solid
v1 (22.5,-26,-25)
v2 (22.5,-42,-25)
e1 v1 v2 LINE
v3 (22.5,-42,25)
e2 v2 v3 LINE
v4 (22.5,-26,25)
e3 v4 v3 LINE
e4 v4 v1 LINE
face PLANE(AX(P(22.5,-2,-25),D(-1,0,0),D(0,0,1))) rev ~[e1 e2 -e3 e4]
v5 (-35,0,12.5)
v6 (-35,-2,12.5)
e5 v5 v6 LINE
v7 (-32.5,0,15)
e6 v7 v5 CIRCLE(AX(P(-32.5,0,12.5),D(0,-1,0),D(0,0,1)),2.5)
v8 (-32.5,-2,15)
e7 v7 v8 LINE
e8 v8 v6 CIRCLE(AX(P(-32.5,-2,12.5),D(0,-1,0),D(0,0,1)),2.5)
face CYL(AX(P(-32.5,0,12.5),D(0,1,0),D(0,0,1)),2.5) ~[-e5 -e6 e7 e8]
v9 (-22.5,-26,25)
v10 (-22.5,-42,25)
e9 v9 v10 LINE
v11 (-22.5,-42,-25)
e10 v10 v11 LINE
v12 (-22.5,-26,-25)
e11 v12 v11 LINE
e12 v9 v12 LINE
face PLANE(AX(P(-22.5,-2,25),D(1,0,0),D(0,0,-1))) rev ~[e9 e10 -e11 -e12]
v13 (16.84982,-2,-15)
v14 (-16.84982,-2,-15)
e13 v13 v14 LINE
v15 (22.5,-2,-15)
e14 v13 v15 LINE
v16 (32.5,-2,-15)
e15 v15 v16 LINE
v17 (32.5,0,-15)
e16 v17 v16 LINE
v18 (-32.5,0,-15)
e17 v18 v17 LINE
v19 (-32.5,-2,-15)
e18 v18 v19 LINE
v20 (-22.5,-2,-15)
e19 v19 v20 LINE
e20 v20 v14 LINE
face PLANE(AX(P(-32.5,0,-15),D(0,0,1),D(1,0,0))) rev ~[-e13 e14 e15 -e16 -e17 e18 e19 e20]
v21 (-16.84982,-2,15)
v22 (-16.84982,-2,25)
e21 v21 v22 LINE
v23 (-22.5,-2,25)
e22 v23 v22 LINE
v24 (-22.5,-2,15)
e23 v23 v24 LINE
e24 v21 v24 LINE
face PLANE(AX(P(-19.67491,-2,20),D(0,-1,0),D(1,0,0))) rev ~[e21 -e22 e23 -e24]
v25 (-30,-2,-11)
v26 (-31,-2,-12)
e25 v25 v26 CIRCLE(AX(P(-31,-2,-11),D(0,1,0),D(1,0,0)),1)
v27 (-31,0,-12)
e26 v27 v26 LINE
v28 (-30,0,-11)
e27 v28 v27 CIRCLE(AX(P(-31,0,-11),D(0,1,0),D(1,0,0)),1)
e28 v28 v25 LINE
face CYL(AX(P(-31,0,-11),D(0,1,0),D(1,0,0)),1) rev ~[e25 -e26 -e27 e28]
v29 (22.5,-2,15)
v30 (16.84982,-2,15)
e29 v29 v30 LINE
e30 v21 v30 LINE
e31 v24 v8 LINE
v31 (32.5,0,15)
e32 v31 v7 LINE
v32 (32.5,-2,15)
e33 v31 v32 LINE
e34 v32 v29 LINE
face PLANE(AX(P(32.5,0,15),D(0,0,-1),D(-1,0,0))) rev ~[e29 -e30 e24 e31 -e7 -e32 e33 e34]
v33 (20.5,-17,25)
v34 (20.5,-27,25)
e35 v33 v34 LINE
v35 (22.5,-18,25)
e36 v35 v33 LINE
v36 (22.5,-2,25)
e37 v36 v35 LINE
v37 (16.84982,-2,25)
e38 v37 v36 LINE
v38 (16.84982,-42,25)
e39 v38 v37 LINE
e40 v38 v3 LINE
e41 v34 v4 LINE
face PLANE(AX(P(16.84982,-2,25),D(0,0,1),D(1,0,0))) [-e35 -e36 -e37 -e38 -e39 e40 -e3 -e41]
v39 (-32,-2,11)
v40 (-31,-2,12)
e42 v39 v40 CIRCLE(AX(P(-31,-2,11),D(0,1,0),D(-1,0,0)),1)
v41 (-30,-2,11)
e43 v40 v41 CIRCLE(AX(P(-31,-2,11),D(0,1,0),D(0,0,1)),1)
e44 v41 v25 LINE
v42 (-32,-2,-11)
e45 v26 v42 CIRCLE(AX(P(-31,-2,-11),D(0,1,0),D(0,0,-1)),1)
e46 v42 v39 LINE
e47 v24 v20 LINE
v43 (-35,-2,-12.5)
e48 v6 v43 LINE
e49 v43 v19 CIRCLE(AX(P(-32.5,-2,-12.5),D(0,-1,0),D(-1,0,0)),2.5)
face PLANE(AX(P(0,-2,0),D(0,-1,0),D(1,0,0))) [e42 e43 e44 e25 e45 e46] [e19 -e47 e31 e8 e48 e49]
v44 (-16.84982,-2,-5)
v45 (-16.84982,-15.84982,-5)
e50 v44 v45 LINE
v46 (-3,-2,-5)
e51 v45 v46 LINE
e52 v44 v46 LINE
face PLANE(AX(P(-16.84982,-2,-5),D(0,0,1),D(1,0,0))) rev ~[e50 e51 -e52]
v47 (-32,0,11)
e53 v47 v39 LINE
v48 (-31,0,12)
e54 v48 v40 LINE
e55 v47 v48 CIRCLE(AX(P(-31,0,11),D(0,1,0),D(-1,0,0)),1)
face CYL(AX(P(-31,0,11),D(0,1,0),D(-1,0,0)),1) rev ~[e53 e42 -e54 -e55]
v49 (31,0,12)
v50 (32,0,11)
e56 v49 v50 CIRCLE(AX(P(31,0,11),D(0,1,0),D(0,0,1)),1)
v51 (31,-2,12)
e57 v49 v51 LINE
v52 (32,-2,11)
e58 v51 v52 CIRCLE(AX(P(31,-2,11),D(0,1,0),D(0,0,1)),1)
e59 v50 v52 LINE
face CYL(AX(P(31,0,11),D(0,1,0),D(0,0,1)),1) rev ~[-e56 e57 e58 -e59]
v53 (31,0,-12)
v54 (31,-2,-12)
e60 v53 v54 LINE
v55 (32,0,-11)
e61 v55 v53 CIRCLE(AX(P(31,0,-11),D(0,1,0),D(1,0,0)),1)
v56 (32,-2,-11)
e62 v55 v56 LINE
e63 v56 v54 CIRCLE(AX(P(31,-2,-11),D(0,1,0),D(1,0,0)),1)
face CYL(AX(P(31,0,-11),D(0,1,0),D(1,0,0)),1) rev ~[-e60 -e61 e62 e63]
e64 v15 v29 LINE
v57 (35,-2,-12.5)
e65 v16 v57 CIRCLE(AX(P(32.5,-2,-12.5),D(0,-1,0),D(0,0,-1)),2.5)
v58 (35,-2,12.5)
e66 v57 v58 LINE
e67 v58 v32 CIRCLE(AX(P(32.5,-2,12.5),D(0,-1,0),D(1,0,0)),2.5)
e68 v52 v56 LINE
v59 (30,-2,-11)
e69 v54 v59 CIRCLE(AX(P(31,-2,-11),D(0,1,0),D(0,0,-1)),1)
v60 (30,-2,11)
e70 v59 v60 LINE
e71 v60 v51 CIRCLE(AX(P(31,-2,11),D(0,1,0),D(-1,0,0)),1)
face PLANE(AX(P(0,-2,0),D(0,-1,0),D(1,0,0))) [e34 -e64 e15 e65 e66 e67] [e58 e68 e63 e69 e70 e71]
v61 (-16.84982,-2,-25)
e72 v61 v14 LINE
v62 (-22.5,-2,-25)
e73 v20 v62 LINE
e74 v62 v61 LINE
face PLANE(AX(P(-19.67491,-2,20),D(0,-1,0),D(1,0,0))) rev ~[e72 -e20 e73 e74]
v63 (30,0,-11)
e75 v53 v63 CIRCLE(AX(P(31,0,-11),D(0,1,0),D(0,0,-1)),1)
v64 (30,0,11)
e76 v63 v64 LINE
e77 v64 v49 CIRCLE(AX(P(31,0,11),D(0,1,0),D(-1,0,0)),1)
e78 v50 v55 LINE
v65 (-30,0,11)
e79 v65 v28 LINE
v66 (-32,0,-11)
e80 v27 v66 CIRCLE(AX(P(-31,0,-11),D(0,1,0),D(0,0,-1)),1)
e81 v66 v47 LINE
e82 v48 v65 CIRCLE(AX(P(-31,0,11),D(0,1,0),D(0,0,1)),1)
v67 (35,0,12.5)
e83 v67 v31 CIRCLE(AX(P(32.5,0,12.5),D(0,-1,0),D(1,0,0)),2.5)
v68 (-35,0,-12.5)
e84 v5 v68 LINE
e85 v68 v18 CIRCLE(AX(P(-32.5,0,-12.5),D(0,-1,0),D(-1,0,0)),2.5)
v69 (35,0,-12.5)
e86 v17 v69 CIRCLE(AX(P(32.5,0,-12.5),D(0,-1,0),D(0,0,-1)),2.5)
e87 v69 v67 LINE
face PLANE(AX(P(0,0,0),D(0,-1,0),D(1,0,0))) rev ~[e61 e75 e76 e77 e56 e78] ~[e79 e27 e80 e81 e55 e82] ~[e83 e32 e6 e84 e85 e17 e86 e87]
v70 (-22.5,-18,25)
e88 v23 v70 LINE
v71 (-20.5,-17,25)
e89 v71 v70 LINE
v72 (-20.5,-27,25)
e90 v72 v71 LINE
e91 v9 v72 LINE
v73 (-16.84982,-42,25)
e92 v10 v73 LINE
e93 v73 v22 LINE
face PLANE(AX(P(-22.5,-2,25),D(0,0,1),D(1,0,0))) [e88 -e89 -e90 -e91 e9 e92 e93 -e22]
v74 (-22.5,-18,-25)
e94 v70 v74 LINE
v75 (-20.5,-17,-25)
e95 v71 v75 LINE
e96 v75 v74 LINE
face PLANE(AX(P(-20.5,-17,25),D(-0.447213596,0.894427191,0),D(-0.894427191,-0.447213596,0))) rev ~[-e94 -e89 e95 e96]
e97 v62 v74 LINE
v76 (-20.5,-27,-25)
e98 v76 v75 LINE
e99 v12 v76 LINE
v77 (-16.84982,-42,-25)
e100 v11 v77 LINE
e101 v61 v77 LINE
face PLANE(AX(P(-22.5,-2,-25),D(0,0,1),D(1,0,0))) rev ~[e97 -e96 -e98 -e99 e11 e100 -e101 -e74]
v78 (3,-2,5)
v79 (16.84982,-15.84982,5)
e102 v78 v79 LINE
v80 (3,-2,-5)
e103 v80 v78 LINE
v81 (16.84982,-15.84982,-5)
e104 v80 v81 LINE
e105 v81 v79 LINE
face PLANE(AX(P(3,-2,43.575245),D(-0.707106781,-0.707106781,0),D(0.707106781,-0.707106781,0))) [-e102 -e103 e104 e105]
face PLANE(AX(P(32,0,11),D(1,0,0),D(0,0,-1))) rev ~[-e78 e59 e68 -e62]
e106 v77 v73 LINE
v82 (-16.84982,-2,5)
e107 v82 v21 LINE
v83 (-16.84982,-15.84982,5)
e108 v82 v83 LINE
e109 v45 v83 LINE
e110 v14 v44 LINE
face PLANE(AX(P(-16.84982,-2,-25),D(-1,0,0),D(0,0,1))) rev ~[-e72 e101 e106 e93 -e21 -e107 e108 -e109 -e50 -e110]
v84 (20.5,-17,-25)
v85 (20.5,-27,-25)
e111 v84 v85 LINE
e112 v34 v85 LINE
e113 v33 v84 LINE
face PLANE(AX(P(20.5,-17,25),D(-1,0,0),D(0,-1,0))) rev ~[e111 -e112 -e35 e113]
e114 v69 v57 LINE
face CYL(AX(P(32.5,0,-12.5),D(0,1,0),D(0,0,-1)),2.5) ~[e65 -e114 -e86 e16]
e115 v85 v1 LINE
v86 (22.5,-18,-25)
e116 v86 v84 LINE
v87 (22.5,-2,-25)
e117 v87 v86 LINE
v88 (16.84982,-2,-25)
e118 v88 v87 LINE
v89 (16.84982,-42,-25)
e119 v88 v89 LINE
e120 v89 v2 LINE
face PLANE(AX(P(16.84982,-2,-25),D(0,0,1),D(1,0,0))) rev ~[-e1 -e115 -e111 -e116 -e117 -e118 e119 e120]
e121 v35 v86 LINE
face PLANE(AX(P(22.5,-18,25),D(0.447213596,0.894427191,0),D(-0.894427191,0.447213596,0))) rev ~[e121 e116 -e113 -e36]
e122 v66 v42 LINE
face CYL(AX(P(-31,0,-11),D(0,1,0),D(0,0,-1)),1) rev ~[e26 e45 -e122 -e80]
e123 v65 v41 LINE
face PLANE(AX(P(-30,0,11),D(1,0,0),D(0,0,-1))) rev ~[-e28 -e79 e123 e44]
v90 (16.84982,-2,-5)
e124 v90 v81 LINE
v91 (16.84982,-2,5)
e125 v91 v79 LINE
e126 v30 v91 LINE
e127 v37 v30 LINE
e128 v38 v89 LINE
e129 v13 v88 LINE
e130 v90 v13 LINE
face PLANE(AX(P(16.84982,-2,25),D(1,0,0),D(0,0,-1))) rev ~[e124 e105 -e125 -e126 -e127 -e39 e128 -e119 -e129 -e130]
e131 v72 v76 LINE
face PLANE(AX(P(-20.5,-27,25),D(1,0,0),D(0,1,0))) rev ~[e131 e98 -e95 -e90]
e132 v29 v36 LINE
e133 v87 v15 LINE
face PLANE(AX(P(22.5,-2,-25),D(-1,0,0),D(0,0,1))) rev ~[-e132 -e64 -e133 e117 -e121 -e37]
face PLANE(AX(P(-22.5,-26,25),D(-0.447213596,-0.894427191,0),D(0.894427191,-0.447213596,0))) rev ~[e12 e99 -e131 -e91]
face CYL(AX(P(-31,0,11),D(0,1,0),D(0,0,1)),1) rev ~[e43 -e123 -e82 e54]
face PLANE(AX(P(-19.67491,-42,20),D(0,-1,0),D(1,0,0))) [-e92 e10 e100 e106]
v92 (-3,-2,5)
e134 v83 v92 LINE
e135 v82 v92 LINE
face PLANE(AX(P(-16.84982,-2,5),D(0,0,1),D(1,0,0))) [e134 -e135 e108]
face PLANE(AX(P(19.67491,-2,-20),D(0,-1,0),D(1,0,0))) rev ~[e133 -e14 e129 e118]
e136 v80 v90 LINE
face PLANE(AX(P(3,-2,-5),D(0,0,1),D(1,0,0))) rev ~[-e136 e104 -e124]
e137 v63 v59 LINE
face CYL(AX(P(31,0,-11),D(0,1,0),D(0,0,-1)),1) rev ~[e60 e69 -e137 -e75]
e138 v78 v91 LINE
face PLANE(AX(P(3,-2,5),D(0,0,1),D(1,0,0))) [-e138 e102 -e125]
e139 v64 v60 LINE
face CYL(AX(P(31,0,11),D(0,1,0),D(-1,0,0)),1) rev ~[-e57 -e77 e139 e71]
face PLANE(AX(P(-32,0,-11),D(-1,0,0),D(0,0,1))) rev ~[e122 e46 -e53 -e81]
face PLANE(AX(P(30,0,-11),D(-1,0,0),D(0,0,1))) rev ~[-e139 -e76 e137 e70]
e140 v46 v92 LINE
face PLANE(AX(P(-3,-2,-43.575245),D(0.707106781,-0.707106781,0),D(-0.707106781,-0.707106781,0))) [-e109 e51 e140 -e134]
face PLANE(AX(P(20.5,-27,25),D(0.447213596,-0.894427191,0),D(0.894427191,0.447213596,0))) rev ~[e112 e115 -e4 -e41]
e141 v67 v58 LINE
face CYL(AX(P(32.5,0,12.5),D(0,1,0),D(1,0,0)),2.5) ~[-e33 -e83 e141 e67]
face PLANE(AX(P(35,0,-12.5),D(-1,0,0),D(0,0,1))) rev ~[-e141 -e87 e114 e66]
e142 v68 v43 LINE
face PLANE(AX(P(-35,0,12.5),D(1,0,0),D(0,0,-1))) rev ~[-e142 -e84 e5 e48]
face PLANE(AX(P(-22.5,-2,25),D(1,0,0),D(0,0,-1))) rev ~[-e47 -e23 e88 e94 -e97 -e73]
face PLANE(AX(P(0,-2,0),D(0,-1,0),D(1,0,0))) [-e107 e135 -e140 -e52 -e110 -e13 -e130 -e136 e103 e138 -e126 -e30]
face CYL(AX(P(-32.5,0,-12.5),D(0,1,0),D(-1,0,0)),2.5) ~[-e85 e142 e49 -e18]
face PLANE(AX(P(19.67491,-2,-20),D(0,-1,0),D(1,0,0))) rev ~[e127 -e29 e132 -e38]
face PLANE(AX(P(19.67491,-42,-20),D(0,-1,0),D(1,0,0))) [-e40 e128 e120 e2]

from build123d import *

# Parameters (mm, degrees)
F1_DEPTH      = 2
F2_W          = 5.6501800592
F2_H          = 10
F2_H_2        = 30
F3_DEPTH      = 40
F5_DEPTH      = 50
F7_DEPTH      = 50
F8_W          = 13.8498199408
F8_H          = 10
F9_DEPTH      = 15
F10_T4_DEPTH  = 87.150489639
F10_T10_DEPTH = 87.150489639


# Not quite as in the source:
# - a fillet or chamfer that OpenCascade refuses, or shapes differently, is made with other operations: its cross-section is extruded or revolved along the edge and cut away or added


with BuildPart() as f1:
    # F0 (on Front) → F1 (new body)
    with BuildSketch(Plane.XZ):
        with BuildLine():
            Line((32.5, 15), (-32.5, 15))
            ThreePointArc((-32.5, 15), (-34.267766953, 14.267766953), (-35, 12.5))
            Line((-35, 12.5), (-35, -12.5))
            ThreePointArc((-35, -12.5), (-34.267766953, -14.267766953), (-32.5, -15))
            Line((-32.5, -15), (32.5, -15))
            ThreePointArc((32.5, -15), (34.267766953, -14.267766953), (35, -12.5))
            Line((35, -12.5), (35, 12.5))
            ThreePointArc((35, 12.5), (34.267766953, 14.267766953), (32.5, 15))
        make_face()
        with BuildLine():
            Line((-32, -11), (-32, 11))
            ThreePointArc((-32, 11), (-31.7071067812, 11.7071067812), (-31, 12))
            ThreePointArc((-31, 12), (-30.2928932188, 11.7071067812), (-30, 11))
            Line((-30, 11), (-30, -11))
            ThreePointArc((-30, -11), (-30.2928932188, -11.7071067812), (-31, -12))
            ThreePointArc((-31, -12), (-31.7071067812, -11.7071067812), (-32, -11))
        make_face(mode=Mode.SUBTRACT)
        with BuildLine():
            Line((30, -11), (30, 11))
            ThreePointArc((30, 11), (30.2928932188, 11.7071067812), (31, 12))
            ThreePointArc((31, 12), (31.7071067812, 11.7071067812), (32, 11))
            Line((32, 11), (32, -11))
            ThreePointArc((32, -11), (31.7071067812, -11.7071067812), (31, -12))
            ThreePointArc((31, -12), (30.2928932188, -11.7071067812), (30, -11))
        make_face(mode=Mode.SUBTRACT)
    extrude(amount=F1_DEPTH)

    # F2 (on face) → F3 (join)
    with BuildSketch(Plane.XZ.offset(2)):
        with Locations((-19.6749099704, 20)):
            Rectangle(F2_W, F2_H)
        with Locations((-19.6749099704, 0)):
            Rectangle(F2_W, F2_H_2)
        with Locations((-19.6749099704, -20)):
            Rectangle(F2_W, F2_H)
        with Locations((19.6749099704, -20)):
            Rectangle(F2_W, F2_H)
        with Locations((19.6749099704, 0)):
            Rectangle(F2_W, F2_H_2)
        with Locations((19.6749099704, 20)):
            Rectangle(F2_W, F2_H)
    extrude(amount=F3_DEPTH)

    # F4 (on face) → F5 (cut, through all)
    with BuildSketch(Plane.XY.offset(25)):
        Polygon((-20.5, -17), (-22.5, -18), (-22.5, -26), (-20.5, -27), (-20.5, -26), (-20.5, -18), align=None)
    extrude(amount=-F5_DEPTH, mode=Mode.SUBTRACT)

    # F6 (on face) → F7 (cut, through all)
    with BuildSketch(Plane.XY.offset(25)):
        Polygon((22.5, -26), (22.5, -18), (20.5, -17), (20.5, -18), (20.5, -26), (20.5, -27), align=None)
    extrude(amount=-F7_DEPTH, mode=Mode.SUBTRACT)

    # F8 (on face) → F9 (join)
    with BuildSketch(Plane.XZ.offset(2)):
        with Locations((-9.9249099704, 0)):
            Rectangle(F8_W, F8_H)
        with Locations((9.9249099704, 0)):
            Rectangle(F8_W, F8_H)
    extrude(amount=F9_DEPTH)

    # F10: chamfer of 15 on 2 edges, made by hand


with BuildPart() as f10_tool2:
    # F10_s3 → F10_t4 (new body)
    with BuildSketch(Plane.XY.offset(-43.5752448195)):
        Polygon((-3, -2), (-18, -17), (-3, -17), align=None)
    extrude(amount=F10_T4_DEPTH)

    split(bisect_by=Plane.XZ.offset(2), keep=Keep.TOP)

    split(bisect_by=Plane.YZ.offset(-16.8498199408), keep=Keep.TOP)


with BuildPart() as f1_1:
    add(f1.part)

    # F10_t1: cut F10_tool2
    add(f10_tool2.part, mode=Mode.SUBTRACT)


with BuildPart() as f10_tool8:
    # F10_s9 → F10_t10 (new body)
    with BuildSketch(Plane.XY.offset(43.5752448195)):
        Polygon((3, -2), (18, -17), (3, -17), align=None)
    extrude(amount=-F10_T10_DEPTH)

    split(bisect_by=Plane.XZ.offset(2), keep=Keep.TOP)

    split(bisect_by=Plane.YZ.offset(16.8498199408), keep=Keep.BOTTOM)


with BuildPart() as f1_2:
    add(f1_1.part)

    # F10_t7: cut F10_tool8
    add(f10_tool8.part, mode=Mode.SUBTRACT)


solid = f1_2.part
